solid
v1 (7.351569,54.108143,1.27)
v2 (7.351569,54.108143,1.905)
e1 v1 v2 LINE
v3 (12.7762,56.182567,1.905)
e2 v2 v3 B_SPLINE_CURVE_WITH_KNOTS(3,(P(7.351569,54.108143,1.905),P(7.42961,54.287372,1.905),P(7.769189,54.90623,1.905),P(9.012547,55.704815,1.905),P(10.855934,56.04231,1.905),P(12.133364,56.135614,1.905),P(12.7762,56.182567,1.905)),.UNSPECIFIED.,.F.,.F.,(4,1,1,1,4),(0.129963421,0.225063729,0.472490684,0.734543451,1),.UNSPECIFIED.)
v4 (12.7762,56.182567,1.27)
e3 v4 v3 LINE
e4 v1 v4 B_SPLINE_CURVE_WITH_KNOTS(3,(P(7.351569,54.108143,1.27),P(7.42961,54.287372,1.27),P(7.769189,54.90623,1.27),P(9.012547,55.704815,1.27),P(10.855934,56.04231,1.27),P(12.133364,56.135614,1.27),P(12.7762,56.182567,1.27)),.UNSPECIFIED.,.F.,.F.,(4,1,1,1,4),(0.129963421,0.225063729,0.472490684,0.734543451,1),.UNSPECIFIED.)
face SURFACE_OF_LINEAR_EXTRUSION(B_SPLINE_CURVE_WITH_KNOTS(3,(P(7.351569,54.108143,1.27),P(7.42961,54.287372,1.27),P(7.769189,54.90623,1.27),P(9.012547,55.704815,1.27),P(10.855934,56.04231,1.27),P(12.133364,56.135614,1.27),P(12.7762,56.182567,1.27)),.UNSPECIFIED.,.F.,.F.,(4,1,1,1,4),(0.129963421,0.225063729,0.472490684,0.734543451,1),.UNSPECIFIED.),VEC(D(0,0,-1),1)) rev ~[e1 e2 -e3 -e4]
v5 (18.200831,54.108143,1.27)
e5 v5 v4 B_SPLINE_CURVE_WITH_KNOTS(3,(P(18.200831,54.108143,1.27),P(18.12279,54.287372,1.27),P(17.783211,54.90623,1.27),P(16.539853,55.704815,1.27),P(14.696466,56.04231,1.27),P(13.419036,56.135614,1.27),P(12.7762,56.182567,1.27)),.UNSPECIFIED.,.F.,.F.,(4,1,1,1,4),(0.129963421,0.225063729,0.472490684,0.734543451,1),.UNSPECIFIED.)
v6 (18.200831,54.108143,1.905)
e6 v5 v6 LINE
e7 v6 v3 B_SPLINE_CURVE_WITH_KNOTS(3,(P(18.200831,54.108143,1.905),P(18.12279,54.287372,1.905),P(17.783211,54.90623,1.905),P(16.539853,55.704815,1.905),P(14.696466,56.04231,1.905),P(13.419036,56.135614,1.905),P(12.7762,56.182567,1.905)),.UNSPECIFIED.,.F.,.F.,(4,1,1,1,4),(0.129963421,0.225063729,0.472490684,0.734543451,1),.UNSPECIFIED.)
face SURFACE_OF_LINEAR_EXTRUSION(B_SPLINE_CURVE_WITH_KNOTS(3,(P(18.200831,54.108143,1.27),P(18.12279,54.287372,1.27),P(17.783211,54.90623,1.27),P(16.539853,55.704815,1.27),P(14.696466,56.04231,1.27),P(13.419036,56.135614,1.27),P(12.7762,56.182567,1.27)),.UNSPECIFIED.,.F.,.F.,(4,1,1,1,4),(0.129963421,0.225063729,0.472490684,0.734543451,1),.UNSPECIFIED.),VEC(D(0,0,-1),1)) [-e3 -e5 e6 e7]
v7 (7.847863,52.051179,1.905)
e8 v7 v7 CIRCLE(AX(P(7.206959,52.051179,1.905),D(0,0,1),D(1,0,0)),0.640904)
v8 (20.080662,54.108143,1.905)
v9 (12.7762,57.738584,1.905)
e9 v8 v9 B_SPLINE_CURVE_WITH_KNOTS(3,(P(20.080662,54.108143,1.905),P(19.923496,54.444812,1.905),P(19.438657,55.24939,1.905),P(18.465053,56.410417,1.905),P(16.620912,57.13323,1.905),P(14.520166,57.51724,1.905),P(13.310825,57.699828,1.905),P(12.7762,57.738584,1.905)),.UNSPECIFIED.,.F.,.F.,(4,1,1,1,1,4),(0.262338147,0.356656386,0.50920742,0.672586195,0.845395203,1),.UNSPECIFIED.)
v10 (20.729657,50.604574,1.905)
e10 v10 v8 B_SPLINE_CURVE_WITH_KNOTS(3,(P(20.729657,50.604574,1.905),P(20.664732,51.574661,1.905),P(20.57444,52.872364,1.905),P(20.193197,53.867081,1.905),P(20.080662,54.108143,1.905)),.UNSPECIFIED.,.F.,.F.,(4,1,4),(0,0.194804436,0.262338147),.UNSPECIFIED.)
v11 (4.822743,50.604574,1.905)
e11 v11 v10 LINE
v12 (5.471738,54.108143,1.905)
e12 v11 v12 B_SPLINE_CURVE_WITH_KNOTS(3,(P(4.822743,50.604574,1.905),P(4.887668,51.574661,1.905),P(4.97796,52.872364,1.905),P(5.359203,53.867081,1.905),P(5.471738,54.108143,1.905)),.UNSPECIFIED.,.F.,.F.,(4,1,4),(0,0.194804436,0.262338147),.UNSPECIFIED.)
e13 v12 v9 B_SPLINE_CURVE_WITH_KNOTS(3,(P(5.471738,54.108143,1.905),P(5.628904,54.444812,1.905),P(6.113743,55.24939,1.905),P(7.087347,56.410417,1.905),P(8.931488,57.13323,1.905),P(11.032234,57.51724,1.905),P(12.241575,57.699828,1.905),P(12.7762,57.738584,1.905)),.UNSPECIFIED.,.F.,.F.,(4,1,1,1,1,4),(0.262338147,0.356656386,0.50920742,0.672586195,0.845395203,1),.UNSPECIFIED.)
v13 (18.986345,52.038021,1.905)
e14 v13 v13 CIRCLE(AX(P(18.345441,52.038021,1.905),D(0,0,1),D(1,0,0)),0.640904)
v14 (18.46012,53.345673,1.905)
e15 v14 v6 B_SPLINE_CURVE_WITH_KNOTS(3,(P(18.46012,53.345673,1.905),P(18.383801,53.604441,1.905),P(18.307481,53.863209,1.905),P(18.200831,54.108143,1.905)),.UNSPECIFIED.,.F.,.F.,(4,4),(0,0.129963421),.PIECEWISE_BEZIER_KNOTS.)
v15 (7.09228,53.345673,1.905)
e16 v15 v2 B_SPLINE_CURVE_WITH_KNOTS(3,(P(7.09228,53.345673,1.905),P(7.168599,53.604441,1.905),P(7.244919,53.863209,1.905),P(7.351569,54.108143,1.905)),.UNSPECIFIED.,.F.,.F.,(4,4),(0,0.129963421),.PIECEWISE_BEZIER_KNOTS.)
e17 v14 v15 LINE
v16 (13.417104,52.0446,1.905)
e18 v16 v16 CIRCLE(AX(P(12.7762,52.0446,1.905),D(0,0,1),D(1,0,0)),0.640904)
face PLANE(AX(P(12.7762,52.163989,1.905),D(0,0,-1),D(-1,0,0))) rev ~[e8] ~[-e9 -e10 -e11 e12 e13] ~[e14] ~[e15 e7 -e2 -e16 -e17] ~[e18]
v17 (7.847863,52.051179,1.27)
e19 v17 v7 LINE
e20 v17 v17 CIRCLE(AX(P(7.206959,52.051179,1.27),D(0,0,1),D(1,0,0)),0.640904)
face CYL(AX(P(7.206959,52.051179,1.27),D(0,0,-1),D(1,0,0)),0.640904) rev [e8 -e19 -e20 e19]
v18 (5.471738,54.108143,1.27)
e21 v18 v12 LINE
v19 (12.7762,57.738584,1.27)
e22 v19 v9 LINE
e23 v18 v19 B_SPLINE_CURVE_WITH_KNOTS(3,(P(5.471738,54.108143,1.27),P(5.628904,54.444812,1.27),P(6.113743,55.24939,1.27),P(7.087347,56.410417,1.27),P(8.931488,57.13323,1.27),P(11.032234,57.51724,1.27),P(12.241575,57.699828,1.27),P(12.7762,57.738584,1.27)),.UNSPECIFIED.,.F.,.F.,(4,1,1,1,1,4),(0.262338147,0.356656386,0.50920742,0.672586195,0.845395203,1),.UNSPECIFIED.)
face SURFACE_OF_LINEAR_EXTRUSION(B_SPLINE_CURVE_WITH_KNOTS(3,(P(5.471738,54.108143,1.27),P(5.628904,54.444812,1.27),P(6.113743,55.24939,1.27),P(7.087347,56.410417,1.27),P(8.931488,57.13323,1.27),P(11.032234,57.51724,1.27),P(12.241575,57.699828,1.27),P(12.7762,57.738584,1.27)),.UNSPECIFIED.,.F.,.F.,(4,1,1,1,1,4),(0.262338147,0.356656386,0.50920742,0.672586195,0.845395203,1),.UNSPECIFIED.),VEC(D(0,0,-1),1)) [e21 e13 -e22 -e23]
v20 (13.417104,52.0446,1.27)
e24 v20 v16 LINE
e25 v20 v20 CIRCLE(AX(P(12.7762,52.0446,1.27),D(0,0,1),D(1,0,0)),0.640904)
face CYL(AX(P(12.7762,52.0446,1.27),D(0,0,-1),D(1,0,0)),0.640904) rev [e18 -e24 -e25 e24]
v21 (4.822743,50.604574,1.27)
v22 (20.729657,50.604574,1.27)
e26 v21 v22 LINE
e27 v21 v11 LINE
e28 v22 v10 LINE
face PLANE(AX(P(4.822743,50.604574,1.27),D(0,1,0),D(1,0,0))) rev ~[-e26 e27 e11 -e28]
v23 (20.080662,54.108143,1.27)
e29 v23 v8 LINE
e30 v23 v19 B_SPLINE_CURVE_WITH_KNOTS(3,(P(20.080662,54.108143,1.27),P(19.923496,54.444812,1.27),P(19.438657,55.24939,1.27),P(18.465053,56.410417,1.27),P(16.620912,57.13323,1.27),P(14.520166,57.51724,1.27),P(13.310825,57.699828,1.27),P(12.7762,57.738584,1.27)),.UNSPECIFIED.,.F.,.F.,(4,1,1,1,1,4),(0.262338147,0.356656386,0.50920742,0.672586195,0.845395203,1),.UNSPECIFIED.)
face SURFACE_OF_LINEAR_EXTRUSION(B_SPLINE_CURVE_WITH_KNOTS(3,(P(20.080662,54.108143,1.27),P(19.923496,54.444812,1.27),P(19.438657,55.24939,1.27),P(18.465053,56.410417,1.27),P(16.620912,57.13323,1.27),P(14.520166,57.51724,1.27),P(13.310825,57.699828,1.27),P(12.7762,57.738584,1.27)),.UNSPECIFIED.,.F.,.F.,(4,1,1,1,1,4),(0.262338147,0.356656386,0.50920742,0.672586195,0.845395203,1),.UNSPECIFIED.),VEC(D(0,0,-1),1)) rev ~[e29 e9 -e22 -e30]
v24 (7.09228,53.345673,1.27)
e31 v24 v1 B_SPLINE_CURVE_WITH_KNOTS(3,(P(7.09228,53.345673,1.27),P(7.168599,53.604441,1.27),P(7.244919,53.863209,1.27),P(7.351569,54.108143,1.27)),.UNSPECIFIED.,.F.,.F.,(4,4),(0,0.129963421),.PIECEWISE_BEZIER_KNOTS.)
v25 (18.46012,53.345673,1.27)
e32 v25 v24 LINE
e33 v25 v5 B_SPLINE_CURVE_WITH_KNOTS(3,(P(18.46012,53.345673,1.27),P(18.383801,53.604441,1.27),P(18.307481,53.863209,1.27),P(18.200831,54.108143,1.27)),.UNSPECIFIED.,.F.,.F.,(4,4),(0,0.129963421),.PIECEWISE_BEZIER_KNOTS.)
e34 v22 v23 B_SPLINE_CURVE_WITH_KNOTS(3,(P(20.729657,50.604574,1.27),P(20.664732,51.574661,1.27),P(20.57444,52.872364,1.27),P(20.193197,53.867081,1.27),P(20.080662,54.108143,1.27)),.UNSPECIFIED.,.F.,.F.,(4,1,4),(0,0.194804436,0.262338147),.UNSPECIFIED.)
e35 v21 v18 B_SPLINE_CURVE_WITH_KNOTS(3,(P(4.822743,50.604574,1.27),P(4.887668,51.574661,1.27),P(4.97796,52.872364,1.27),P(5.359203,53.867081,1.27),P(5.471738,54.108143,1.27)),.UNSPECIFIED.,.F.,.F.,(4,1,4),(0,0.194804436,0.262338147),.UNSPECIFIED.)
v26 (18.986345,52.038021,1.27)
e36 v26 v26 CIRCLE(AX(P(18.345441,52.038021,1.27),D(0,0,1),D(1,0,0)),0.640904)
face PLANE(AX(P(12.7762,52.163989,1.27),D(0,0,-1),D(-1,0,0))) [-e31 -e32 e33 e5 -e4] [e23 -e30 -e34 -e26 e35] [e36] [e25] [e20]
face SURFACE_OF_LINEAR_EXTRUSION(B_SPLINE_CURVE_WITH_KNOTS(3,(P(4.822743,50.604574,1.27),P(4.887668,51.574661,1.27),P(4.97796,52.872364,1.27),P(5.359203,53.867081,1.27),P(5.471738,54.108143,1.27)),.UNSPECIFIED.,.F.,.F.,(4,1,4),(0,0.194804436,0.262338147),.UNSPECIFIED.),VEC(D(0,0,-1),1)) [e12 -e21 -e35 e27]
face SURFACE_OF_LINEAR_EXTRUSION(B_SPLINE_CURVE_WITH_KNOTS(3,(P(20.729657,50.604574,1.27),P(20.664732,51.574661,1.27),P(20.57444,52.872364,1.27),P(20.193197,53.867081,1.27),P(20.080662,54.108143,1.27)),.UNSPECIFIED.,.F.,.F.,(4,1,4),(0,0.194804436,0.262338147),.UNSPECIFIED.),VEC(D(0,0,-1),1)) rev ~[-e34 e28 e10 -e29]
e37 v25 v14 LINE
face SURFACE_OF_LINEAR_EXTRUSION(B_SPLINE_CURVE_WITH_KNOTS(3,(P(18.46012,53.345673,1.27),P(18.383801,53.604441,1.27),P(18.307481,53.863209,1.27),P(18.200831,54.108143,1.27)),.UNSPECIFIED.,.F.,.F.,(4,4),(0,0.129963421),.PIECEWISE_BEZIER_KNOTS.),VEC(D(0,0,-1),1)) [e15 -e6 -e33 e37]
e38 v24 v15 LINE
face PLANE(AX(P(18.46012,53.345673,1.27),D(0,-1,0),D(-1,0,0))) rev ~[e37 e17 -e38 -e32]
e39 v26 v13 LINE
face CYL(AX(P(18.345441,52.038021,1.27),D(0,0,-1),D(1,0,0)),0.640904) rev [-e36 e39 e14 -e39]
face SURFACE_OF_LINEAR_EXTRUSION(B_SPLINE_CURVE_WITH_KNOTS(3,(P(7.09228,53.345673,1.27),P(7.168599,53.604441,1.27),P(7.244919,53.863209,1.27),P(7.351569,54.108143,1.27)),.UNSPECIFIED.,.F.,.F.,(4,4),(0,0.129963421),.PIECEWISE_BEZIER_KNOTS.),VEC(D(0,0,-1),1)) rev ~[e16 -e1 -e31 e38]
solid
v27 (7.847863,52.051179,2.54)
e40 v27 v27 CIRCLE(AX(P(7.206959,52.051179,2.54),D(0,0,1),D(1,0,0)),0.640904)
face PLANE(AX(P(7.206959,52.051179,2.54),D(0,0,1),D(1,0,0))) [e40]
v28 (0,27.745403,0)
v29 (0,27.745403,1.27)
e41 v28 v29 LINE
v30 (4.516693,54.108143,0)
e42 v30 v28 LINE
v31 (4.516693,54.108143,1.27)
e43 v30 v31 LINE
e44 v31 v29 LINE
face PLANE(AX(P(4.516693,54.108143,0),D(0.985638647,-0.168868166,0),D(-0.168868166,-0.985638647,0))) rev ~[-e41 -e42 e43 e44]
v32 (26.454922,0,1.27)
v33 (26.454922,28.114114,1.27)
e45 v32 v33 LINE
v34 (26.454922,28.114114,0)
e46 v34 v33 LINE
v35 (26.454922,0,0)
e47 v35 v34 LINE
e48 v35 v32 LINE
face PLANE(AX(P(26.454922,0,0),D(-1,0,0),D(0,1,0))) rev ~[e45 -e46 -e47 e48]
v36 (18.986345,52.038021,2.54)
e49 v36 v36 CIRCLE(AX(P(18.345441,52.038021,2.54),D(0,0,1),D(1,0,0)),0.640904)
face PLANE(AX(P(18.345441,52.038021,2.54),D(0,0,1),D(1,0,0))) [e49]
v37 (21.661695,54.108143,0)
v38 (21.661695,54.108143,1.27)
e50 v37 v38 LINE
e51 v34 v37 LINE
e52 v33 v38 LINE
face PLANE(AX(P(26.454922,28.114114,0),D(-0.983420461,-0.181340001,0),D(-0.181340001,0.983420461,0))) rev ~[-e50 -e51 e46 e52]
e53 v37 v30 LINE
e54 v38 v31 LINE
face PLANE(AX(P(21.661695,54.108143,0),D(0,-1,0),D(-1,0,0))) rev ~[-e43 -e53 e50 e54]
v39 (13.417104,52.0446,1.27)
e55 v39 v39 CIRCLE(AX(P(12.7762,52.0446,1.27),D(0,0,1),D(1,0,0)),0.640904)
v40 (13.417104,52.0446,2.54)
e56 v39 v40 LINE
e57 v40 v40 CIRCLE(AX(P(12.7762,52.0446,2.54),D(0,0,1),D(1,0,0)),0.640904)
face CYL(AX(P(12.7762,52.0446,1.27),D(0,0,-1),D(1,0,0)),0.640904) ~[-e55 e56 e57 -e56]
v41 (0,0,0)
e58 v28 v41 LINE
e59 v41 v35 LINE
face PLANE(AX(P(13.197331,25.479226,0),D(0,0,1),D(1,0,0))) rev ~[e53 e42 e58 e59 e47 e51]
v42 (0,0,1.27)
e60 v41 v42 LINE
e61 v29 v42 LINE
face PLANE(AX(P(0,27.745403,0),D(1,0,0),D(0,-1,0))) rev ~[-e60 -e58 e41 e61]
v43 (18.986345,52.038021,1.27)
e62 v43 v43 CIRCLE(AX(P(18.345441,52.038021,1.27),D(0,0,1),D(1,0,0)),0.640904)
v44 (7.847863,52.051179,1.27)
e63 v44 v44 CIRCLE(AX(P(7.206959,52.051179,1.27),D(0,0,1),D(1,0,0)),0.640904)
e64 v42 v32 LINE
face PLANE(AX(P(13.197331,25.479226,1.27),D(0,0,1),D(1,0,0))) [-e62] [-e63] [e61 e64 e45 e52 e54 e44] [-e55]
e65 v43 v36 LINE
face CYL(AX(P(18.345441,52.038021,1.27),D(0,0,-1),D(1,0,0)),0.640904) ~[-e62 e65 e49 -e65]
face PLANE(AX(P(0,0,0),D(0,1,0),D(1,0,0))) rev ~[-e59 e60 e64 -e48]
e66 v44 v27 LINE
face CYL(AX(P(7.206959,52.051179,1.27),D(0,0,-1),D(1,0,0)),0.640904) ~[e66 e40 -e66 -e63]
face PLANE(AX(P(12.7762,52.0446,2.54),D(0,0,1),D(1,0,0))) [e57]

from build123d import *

# Parameters (mm, degrees)
F1_DEPTH = 1.27
F2_R     = 0.6409039012
F3_DEPTH = 1.27
F4_R     = 0.6409039012
F5_DEPTH = 0.635


with BuildPart() as f1:
    # F0 (on Top) → F1 (new body)
    with BuildSketch(Plane.XY):
        Polygon((4.5166932978, 54.1081428528), (0, 27.7454033494), (0, 0), (26.4549218118, 0), (26.4549218118, 28.1141139567), (21.6616950929, 54.1081428528), align=None)
    extrude(amount=F1_DEPTH)

    # F2 (on face) → F3 (join)
    with BuildSketch(Plane.XY.offset(1.27)):
        with Locations((7.2069587186, 52.051179111)):
            Circle(F2_R)
        with Locations((12.7762, 52.0446)):
            Circle(F2_R)
        with Locations((18.3454412814, 52.038020889)):
            Circle(F2_R)
    extrude(amount=F3_DEPTH)


with BuildPart() as f5:
    # F4 (on face) → F5 (new body)
    with BuildSketch(Plane.XY.offset(1.27)):
        with BuildLine():
            add(Edge.make_bspline(
                [(4.8227427374, 50.6045743823), (4.8876676433, 51.57466059), (4.9779603593, 52.8723637447), (5.3592032539, 53.8670811307), (5.4717375273, 54.1081428528)],
                knots=[0, 0, 0, 0, 0.1948044361, 0.262338147, 0.262338147, 0.262338147, 0.262338147], degree=3))
            Line((4.8227427374, 50.6045743823), (20.7296572626, 50.6045743823))
            add(Edge.make_bspline(
                [(20.7296572626, 50.6045743823), (20.6647323567, 51.57466059), (20.5744396407, 52.8723637447), (20.1931967461, 53.8670811307), (20.0806624727, 54.1081428528)],
                knots=[0, 0, 0, 0, 0.1948044361, 0.262338147, 0.262338147, 0.262338147, 0.262338147], degree=3))
            Line((20.0806624727, 54.1081428528), (18.2008306329, 54.1081428528))
            add(Edge.make_bspline(
                [(18.4601201523, 53.3456727862), (18.3838005475, 53.6044409864), (18.3074809427, 53.8632091865), (18.2008306329, 54.1081428528)],
                knots=[0, 0, 0, 0, 0.1299634207, 0.1299634207, 0.1299634207, 0.1299634207], degree=3))
            Line((18.4601201523, 53.3456727862), (12.7762, 53.3456727862))
            Line((12.7762, 53.3456727862), (7.0922798477, 53.3456727862))
            add(Edge.make_bspline(
                [(7.0922798477, 53.3456727862), (7.1685994525, 53.6044409864), (7.2449190573, 53.8632091865), (7.3515693671, 54.1081428528)],
                knots=[0, 0, 0, 0, 0.1299634207, 0.1299634207, 0.1299634207, 0.1299634207], degree=3))
            Line((7.3515693671, 54.1081428528), (5.4717375273, 54.1081428528))
        make_face()
        with Locations((7.2069587186, 52.051179111)):
            Circle(F4_R, mode=Mode.SUBTRACT)
        with Locations((12.7762, 52.0446)):
            Circle(F4_R, mode=Mode.SUBTRACT)
        with Locations((18.3454412814, 52.038020889)):
            Circle(F4_R, mode=Mode.SUBTRACT)
        with BuildLine():
            add(Edge.make_bspline(
                [(5.4717375273, 54.1081428528), (5.6289039905, 54.4448120036), (6.1137426448, 55.2493900595), (7.0873471955, 56.4104167137), (8.9314876501, 57.1332297998), (11.0322335818, 57.517239989), (12.2415750936, 57.6998275416), (12.7762, 57.738583535)],
                knots=[0.262338147, 0.262338147, 0.262338147, 0.262338147, 0.3566563861, 0.50920742, 0.6725861947, 0.8453952027, 1, 1, 1, 1], degree=3))
            Line((5.4717375273, 54.1081428528), (7.3515693671, 54.1081428528))
            add(Edge.make_bspline(
                [(7.3515693671, 54.1081428528), (7.4296103827, 54.2873722627), (7.7691891934, 54.9062304462), (9.0125467827, 55.7048152887), (10.8559336302, 56.0423099147), (12.1333636483, 56.1356138926), (12.7762, 56.182566906)],
                knots=[0.1299634207, 0.1299634207, 0.1299634207, 0.1299634207, 0.2250637291, 0.4724906838, 0.7345434509, 1, 1, 1, 1], degree=3))
            add(Edge.make_bspline(
                [(18.2008306329, 54.1081428528), (18.1227896173, 54.2873722627), (17.7832108066, 54.9062304462), (16.5398532173, 55.7048152887), (14.6964663698, 56.0423099147), (13.4190363517, 56.1356138926), (12.7762, 56.182566906)],
                knots=[0.1299634207, 0.1299634207, 0.1299634207, 0.1299634207, 0.2250637291, 0.4724906838, 0.7345434509, 1, 1, 1, 1], degree=3))
            Line((18.2008306329, 54.1081428528), (20.0806624727, 54.1081428528))
            add(Edge.make_bspline(
                [(20.0806624727, 54.1081428528), (19.9234960095, 54.4448120036), (19.4386573552, 55.2493900595), (18.4650528045, 56.4104167137), (16.6209123499, 57.1332297998), (14.5201664182, 57.517239989), (13.3108249064, 57.6998275416), (12.7762, 57.738583535)],
                knots=[0.262338147, 0.262338147, 0.262338147, 0.262338147, 0.3566563861, 0.50920742, 0.6725861947, 0.8453952027, 1, 1, 1, 1], degree=3))
        make_face()
    extrude(amount=F5_DEPTH)


solid = Compound([f1.part, f5.part])
